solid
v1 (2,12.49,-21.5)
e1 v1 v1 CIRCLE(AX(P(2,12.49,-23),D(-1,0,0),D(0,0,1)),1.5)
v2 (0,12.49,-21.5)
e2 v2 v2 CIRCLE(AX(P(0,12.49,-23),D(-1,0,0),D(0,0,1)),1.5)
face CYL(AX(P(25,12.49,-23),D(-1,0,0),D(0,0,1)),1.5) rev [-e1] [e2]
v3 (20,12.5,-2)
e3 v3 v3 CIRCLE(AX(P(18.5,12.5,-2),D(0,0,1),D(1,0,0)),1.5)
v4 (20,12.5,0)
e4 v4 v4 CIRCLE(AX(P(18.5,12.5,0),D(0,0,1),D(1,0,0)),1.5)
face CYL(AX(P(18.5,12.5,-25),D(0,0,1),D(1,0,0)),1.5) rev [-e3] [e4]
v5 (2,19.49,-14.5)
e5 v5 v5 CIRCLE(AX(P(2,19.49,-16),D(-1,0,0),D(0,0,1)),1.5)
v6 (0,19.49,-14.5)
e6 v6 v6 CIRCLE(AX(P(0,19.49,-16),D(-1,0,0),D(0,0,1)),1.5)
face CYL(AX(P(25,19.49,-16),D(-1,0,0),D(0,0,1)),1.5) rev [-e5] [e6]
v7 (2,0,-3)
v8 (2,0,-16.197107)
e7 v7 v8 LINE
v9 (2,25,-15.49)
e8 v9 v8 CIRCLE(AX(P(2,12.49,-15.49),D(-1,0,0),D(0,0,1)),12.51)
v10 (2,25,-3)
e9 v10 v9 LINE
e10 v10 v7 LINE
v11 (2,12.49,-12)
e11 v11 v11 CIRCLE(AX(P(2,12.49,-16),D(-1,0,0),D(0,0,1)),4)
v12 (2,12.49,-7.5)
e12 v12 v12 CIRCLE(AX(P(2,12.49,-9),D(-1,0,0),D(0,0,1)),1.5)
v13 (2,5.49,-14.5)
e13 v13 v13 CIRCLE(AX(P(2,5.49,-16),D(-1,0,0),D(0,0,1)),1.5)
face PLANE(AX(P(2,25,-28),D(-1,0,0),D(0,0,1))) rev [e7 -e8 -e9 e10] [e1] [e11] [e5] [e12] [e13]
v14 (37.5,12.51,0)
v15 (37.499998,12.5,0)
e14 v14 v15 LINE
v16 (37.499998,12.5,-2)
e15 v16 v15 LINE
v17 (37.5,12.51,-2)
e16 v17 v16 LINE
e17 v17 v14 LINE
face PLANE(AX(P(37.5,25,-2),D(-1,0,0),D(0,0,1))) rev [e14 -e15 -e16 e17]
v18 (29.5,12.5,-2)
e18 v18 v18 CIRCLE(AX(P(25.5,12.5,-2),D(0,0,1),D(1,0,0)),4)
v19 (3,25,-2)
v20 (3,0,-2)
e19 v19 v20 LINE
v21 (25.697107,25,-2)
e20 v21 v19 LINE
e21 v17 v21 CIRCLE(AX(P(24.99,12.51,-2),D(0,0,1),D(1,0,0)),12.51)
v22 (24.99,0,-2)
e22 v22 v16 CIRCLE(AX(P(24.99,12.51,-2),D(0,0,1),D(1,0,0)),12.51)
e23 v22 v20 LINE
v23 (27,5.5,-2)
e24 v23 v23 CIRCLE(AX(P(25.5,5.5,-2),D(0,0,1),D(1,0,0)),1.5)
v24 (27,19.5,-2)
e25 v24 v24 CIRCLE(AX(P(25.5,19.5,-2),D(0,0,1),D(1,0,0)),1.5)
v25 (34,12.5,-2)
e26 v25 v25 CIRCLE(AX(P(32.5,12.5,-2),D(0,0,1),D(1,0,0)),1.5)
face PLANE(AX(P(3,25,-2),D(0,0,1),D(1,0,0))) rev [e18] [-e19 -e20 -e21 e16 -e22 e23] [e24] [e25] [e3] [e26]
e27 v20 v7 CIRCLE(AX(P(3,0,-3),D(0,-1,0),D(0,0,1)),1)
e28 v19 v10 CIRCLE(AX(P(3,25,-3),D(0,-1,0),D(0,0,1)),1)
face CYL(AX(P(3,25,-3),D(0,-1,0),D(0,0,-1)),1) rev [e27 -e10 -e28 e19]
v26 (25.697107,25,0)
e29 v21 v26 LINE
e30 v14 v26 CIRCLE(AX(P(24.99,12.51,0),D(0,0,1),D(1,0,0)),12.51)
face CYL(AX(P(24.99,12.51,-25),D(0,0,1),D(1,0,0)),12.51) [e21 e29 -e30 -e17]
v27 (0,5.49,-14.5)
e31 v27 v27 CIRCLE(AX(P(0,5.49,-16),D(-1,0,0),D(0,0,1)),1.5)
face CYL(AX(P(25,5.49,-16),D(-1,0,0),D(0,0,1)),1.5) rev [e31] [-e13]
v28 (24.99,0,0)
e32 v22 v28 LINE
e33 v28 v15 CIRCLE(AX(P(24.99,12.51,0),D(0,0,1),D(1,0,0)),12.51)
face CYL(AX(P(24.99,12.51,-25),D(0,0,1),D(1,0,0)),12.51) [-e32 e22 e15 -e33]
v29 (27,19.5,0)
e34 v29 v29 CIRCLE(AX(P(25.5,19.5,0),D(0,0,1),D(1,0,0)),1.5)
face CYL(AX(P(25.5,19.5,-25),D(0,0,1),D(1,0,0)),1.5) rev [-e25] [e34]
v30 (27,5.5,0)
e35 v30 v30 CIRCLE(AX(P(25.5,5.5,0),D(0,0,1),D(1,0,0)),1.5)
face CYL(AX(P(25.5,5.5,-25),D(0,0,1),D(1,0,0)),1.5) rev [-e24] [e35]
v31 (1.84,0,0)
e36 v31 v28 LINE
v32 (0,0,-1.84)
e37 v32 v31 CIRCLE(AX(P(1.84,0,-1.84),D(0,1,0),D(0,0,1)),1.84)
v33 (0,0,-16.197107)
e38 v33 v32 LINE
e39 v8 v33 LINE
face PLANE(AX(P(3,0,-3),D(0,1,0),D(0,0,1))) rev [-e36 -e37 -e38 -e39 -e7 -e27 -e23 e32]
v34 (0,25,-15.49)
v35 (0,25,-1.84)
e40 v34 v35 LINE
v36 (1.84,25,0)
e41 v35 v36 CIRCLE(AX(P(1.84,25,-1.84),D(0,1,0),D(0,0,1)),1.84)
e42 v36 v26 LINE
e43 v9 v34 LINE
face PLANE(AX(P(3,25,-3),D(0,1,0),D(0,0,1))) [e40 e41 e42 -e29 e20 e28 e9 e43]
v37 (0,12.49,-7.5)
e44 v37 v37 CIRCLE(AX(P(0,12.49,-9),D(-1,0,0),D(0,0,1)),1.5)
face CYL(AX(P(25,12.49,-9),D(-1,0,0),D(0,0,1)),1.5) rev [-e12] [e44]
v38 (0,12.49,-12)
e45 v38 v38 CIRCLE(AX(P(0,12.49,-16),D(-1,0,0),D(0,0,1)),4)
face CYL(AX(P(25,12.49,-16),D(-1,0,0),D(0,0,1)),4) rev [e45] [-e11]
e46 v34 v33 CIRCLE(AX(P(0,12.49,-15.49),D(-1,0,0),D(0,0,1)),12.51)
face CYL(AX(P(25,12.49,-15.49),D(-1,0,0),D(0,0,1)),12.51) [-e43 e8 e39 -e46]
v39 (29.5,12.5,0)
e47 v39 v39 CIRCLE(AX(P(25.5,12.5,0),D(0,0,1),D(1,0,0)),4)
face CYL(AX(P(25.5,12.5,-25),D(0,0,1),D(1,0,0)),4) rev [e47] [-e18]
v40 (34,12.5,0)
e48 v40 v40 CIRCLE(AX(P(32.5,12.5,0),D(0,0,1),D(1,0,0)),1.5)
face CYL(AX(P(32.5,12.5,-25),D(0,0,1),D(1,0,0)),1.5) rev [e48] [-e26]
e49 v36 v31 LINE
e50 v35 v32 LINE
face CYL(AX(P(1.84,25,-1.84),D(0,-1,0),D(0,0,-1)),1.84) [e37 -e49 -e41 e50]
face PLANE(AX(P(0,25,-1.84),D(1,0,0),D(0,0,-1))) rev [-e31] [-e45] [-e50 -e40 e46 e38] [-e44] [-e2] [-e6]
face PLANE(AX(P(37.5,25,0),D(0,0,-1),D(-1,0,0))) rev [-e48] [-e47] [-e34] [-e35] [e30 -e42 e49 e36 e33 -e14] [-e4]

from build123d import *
from OCP.BRepAlgoAPI import BRepAlgoAPI_Cut
from OCP.TopTools import TopTools_ListOfShape

# Parameters (mm, degrees)
SALIENTE_EXTRUIR1_DEPTH     = 25
CROQUIS2_R                  = 4
CROQUIS2_R_2                = 1.5
CORTAR_EXTRUIR1_DEPTH       = 25
CORTAR_EXTRUIR2_START       = -2
CORTAR_EXTRUIR2_OUTLINE_R   = 1.5
CORTAR_EXTRUIR2_OUTLINE_R_2 = 4
CORTAR_EXTRUIR2_DEPTH       = 2


with BuildPart() as part:
    # Croquis1 → Saliente-Extruir1 (new body)
    with BuildSketch(Plane(origin=(0, 0, 0), x_dir=(1, 0, 0), z_dir=(0, 1, 0))):
        with BuildLine():
            Line((0, 1.84), (0, 28))
            Line((0, 28), (2, 28))
            Line((2, 28), (2, 3))
            ThreePointArc((2, 3), (2.292893219, 2.292893219), (3, 2))
            Line((3, 2), (37.5, 2))
            Line((37.5, 2), (37.5, 0))
            Line((37.5, 0), (1.84, 0))
            ThreePointArc((1.84, 0), (0.538923523, 0.538923523), (0, 1.84))
        make_face()
    extrude(amount=SALIENTE_EXTRUIR1_DEPTH)

    # Croquis2 → Cortar-Extruir1 (cut)
    with BuildSketch(Plane.ZY):
        with Locations((-16, 12.49)):
            Circle(CROQUIS2_R)
        with Locations((-23, 12.49)):
            Circle(CROQUIS2_R_2)
        with BuildLine():
            ThreePointArc((-16.197106781, 0), (-24.582469572, 3.897730388), (-28, 12.49))
            Line((-28, 12.49), (-28, 0))
            Line((-28, 0), (-16.197106781, 0))
        make_face()
        with BuildLine():
            Line((-28, 25), (-28, 12.49))
            ThreePointArc((-28, 12.49), (-24.335905833, 21.335905833), (-15.49, 25))
            Line((-15.49, 25), (-28, 25))
        make_face()
        with Locations((-9, 12.49)):
            Circle(CROQUIS2_R_2)
        with Locations((-16, 19.49)):
            Circle(CROQUIS2_R_2)
        with Locations((-16, 5.49)):
            Circle(CROQUIS2_R_2)
    extrude(amount=-CORTAR_EXTRUIR1_DEPTH, mode=Mode.SUBTRACT)


with BuildPart() as cortar_extruir2_tool:
    # Cortar-Extruir2: read off the stored shape, not the designer's step
    # Cortar-Extruir2 outline → Cortar-Extruir2 (new body)
    with BuildSketch(Plane.XY.offset(CORTAR_EXTRUIR2_START)):
        with BuildLine():
            ThreePointArc((25.697106781, 25), (34.082469572, 21.102269612), (37.5, 12.51))
            Line((37.5, 12.51), (37.5, 25))
            Line((37.5, 25), (25.697106781, 25))
        make_face()
        with BuildLine():
            Line((37.5, 0), (37.499996003, 12.500000002))
            ThreePointArc((37.499996003, 12.500000002), (33.832369592, 3.66055934), (24.99, 0))
            Line((24.99, 0), (37.5, 0))
        make_face()
        with Locations((18.5, 12.5)):
            Circle(CORTAR_EXTRUIR2_OUTLINE_R)
        with Locations((25.5, 19.5)):
            Circle(CORTAR_EXTRUIR2_OUTLINE_R)
        with Locations((25.5, 5.5)):
            Circle(CORTAR_EXTRUIR2_OUTLINE_R)
        with Locations((25.5, 12.5)):
            Circle(CORTAR_EXTRUIR2_OUTLINE_R_2)
        with Locations((32.5, 12.5)):
            Circle(CORTAR_EXTRUIR2_OUTLINE_R)
    extrude(amount=CORTAR_EXTRUIR2_DEPTH)


with BuildPart() as part_1:
    add(part.part)

    # Cortar-Extruir2: cut by cortar_extruir2_tool, with a tolerance
    cortar_extruir2_stock = TopTools_ListOfShape()
    cortar_extruir2_stock.Append(part_1.part.wrapped)
    cortar_extruir2_tools = TopTools_ListOfShape()
    cortar_extruir2_tools.Append(cortar_extruir2_tool.part.wrapped)
    cortar_extruir2_cut = BRepAlgoAPI_Cut()
    cortar_extruir2_cut.SetArguments(cortar_extruir2_stock)
    cortar_extruir2_cut.SetTools(cortar_extruir2_tools)
    cortar_extruir2_cut.SetFuzzyValue(0.00001)
    cortar_extruir2_cut.Build()
    add(Compound.cast(cortar_extruir2_cut.Shape()).solids(), mode=Mode.REPLACE)


solid = part_1.part
